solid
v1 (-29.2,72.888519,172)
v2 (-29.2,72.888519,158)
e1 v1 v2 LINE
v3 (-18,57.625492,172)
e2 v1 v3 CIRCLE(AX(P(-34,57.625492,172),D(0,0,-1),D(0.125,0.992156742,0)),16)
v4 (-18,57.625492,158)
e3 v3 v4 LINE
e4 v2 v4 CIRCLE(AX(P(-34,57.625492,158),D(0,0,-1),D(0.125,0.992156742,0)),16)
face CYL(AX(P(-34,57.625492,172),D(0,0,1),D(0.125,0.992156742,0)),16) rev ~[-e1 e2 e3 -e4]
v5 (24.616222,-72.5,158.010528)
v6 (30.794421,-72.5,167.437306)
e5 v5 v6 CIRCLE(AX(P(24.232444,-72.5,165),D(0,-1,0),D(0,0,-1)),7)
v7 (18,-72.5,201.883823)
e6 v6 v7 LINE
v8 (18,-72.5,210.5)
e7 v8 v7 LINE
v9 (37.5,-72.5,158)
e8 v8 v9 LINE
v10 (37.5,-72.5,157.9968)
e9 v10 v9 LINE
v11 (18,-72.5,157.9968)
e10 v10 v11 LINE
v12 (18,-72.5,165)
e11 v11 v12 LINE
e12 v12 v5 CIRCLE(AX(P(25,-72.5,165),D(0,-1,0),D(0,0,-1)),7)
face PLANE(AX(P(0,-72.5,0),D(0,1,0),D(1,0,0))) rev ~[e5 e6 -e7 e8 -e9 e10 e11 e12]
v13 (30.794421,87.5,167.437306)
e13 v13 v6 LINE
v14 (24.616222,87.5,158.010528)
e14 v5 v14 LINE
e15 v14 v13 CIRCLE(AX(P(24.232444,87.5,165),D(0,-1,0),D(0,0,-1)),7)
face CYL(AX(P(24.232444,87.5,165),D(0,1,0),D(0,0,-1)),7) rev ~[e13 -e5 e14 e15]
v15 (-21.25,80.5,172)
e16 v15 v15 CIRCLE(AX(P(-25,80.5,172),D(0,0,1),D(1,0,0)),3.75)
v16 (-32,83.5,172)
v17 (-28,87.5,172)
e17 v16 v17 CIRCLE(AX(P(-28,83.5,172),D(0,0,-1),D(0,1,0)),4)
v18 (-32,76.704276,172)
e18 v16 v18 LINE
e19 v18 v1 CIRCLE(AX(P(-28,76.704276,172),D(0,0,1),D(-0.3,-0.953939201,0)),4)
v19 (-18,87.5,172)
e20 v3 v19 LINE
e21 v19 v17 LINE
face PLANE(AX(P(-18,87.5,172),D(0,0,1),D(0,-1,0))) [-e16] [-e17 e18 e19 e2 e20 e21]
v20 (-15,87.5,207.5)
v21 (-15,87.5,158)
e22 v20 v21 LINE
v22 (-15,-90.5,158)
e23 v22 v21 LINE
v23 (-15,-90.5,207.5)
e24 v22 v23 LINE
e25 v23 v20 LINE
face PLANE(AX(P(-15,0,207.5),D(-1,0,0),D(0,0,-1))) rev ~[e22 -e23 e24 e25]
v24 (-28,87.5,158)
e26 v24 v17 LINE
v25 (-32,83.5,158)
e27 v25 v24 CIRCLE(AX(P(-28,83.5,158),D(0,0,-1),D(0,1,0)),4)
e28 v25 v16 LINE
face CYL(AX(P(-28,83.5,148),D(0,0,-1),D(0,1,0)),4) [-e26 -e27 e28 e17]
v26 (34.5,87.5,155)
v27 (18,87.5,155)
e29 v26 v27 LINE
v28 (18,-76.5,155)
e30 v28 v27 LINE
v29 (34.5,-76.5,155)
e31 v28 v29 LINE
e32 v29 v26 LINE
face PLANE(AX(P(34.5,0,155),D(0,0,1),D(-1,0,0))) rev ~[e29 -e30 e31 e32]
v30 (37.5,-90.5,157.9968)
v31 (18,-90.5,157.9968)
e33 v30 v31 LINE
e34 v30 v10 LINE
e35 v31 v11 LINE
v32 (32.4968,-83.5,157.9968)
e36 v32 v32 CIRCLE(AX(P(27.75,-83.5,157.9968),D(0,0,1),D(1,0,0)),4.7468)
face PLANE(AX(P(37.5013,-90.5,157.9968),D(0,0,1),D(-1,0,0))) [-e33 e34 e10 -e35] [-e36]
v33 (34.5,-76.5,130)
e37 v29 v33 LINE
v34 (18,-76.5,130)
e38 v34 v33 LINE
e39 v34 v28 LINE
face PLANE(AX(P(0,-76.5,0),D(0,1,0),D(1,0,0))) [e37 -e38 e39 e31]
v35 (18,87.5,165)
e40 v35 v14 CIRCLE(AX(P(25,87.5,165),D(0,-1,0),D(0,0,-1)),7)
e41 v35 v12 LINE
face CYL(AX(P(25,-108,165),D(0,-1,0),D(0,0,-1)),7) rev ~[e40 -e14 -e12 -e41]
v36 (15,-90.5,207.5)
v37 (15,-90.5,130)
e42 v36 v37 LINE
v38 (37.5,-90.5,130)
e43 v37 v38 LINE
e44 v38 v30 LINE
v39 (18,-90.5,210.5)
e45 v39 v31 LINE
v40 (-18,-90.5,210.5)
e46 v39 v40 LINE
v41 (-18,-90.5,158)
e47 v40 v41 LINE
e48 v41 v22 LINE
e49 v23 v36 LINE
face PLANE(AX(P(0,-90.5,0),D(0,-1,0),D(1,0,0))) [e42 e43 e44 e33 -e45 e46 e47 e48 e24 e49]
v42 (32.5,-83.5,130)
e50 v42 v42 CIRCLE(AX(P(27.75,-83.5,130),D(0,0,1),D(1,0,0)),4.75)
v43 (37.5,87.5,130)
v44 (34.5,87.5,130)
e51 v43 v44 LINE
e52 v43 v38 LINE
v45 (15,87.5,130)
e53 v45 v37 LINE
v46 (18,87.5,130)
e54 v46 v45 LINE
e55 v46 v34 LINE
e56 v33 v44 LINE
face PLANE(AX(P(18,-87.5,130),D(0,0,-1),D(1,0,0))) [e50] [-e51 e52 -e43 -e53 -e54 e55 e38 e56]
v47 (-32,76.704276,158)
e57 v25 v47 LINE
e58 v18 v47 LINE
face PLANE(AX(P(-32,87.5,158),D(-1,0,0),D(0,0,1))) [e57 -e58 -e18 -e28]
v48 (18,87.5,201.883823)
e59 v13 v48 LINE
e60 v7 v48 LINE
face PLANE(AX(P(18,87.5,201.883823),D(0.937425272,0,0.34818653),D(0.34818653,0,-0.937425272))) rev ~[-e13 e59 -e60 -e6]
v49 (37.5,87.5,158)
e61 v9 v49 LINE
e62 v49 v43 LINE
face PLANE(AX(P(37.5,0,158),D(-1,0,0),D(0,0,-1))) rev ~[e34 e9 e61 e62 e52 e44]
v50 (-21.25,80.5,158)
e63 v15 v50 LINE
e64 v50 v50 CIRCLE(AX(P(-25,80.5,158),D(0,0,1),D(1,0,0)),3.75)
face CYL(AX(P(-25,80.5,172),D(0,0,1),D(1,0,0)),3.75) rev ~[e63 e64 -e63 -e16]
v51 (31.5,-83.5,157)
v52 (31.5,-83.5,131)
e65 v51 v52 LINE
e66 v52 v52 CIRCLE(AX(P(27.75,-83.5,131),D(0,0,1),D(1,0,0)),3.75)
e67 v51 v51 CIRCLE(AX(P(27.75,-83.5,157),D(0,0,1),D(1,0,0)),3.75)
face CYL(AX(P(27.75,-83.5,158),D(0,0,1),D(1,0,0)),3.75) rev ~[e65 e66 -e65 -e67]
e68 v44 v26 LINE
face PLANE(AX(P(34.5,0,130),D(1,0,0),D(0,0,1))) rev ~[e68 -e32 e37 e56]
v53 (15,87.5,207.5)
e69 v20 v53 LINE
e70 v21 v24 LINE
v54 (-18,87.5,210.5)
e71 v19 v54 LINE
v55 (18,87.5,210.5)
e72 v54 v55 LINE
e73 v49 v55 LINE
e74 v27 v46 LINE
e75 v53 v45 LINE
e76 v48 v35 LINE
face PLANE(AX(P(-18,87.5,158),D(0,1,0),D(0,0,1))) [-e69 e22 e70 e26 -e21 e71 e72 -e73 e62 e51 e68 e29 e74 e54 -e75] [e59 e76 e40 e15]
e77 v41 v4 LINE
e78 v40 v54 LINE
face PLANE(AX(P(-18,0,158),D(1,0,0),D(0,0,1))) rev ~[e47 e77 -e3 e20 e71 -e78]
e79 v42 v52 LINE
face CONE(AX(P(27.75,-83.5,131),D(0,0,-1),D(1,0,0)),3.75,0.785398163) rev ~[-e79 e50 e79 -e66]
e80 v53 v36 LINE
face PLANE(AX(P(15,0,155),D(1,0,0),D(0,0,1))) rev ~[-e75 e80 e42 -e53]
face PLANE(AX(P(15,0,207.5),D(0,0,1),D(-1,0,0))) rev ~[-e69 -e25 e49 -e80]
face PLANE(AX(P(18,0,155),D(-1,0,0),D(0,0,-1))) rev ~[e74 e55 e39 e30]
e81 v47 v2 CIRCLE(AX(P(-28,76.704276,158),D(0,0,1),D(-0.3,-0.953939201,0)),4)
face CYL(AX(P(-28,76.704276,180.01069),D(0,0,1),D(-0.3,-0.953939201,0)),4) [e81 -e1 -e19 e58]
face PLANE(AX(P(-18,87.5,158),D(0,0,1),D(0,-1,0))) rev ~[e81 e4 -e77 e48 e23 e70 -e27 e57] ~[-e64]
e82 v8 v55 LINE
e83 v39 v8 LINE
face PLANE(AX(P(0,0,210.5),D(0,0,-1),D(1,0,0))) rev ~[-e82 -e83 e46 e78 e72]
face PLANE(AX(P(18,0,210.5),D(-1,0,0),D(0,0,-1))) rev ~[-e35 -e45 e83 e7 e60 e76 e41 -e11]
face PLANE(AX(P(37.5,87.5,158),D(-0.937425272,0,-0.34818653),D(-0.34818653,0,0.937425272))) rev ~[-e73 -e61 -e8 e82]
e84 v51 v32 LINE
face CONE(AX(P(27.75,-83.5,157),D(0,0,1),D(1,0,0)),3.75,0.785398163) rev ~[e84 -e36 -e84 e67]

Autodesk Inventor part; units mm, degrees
ref_plane "YZ Plane" through (0, 0, 0) normal (1, 0, 0) x (0, 1, 0)
ref_plane "XZ Plane" through (0, 0, 0) normal (0, 1, 0) x (-1, 0, 0)
ref_plane "XY Plane" through (0, 0, 0) normal (0, 0, 1) x (1, 0, 0)
sketch "Skizze1" plane through (0, 0, 0) normal (0, 0, 1) x (1, 0, 0)
  line L0 (-26.25, -95) -> (26.25, -95)
  line L1 (26.25, -95) -> (26.25, 95)
  line L2 (26.25, 95) -> (-26.25, 95)
  line L3 (-26.25, 95) -> (-26.25, -95)
  line L4 (-38.4, 0) -> (46.65, 0) projected
  line L5 (0, -140.5) -> (0, 178) projected
  dimension "d0" = 52.5
  dimension "d1" = 190
sketch "Skizze2" plane through (0, 0, 0) normal (0, 1, 0) x (-1, 0, 0)
  line L0 (39, 0) -> (-50.25, 0) projected
  line L1 (0, -228.1) -> (0, 283.6) projected
  line L2 (18, 158) -> (18, 210.5)
  line L3 (18, 210.5) -> (-18, 210.5)
  line L4 (-18, 210.5) -> (-18, 158)
  line L5 (-18, 158) -> (-37.5, 158)
  line L6 (-37.5, 158) -> (-37.5, 130)
  line L7 (-37.5, 130) -> (-34.5, 130)
  line L8 (-34.5, 130) -> (-34.5, 155)
  line L9 (-34.5, 155) -> (-15, 155)
  line L10 (-15, 155) -> (-15, 207.5)
  line L11 (-15, 207.5) -> (15, 207.5)
  line L12 (15, 207.5) -> (15, 158)
  line L13 (15, 158) -> (18, 158)
  line L14 (-15, 155) -> (-18, 155)
  line L15 (-18, 155) -> (-18, 130)
  line L16 (-18, 130) -> (-15, 130)
  line L17 (-15, 130) -> (-15, 155)
  point P0 (0, 0)
  dimension "d2" = 3
  dimension "d3" = 3
  dimension "d4" = 3
  dimension "d5" = 3
  dimension "d6" = 3
  dimension "d7" = 30
  dimension "d8" = 19.5
  dimension "d9" = 77.5
  dimension "d10" = 25
  dimension "d11" = 207.5
extrude "Extrusion1" add sketch "Skizze2" along normal mid plane 175
sketch "Skizze3" plane through (0, -87.5, 0) normal (0, -1, 0) x (1, 0, 0)
  line L0 (-18, 210.5) -> (-18, 158) projected
  line L1 (-18, 158) -> (-15, 158) projected
  line L2 (-15, 158) -> (-15, 207.5) projected
  line L3 (-15, 207.5) -> (15, 207.5) projected
  line L4 (15, 207.5) -> (15, 130) projected
  line L5 (18, 155) -> (34.5, 155) projected
  line L6 (34.5, 155) -> (34.5, 130) projected
  line L7 (34.5, 130) -> (37.5, 130) projected
  line L8 (37.5, 130) -> (37.5, 158) projected
  line L9 (37.5, 158) -> (18, 158) projected
  line L10 (18, 158) -> (18, 210.5) projected
  line L11 (18, 210.5) -> (-18, 210.5) projected
  line L12 (34.5, 130) -> (34.5, 155) projected
  line L13 (34.5, 155) -> (15, 155)
  line L14 (15, 155) -> (15, 130)
  line L15 (15, 130) -> (34.5, 130)
  line L16 (34.5, 130) -> (34.5, 155)
  line L17 (15, 130) -> (18, 130) projected
  line L18 (18, 130) -> (18, 155) projected
  line L19 (15, 130) -> (15, 207.5) projected
extrude "Extrusion2" add sketch "Skizze3" along normal blind 3
sketch "Skizze8" plane through (0, -87.5, 0) normal (0, 1, 0) x (1, 0, 0)
  line L0 (18, -130) -> (18, -155) projected
  line L1 (18, -155) -> (34.5, -155) projected
  line L2 (34.5, -155) -> (34.5, -130) projected
  line L3 (18, -130) -> (34.5, -130) projected
extrude "Extrusion5" add sketch "Skizze8" along normal blind 11
sketch "Skizze9" plane through (18, 87.5, 158) normal (0, 0, 1) x (1, 0, 0)
  circle A0 centre (9.75, -171) radius 3.75
  line L0 (19.5, 0) -> (19.5, -178) construction
  line L1 (0, 0) -> (19.5, 0) projected
  line L2 (0, 0) -> (0, -178) construction
  line L3 (19.5, -178) -> (0, -178) construction
  line L4 (16.5, -164) -> (0, -164) construction
  line L5 (0, -164) -> (19.5, -164) construction
  line L6 (19.5, -164) -> (19.5, -178) construction
  line L7 (19.5, -178) -> (0, -178) construction
  line L8 (0, -178) -> (0, -164) construction
  line L9 (0, 0) -> (0, -178) projected
  line L10 (0, -178) -> (19.5, -164) construction
  line L11 (0, -164) -> (19.5, -178) construction
  dimension "d34" = 7.5
extrude "Extrusion6" cut sketch "Skizze9" against normal through all
chamfer "Fase1" distance 1 angle 45 2 edges at (24, -83.5, 158) (24, -83.5, 130)
sketch "Skizze10" plane through (-18, 87.5, 158) normal (-1, 0, 0) x (0, 0, 1)
  line L0 (0, 0) -> (52.5, 0) projected
  line L1 (52.5, -178) -> (52.5, 0) projected
  line L2 (0, 0) -> (52.5, 0) projected
  line L3 (0, 0) -> (0, -178) projected
  line L4 (52.5, -178) -> (0, -178) projected
  line L5 (0, 0) -> (14, 0)
  line L6 (14, 0) -> (14, -14)
  line L7 (14, -14) -> (0, -14)
  line L8 (0, -14) -> (0, 0)
  dimension "d40" = 14
  dimension "d41" = 14
extrude "Extrusion7" add sketch "Skizze10" along normal blind 14 contours L0 L6 L7 L3
fillet "Rundung2" radius 16 1 edges at (-18, 73.5, 165)
fillet "Rundung2" radius 4 1 edges at (-32, 73.5, 165)
fillet "Rundung2" radius 4 1 edges at (-32, 87.5, 165)
sketch "Skizze11" plane through (-32, 87.5, 172) normal (0, 0, 1) x (1, 0, 0)
  circle A0 centre (7, -7) radius 7
  arc A1 (0, -10.7957) -> (2.8, -14.6115) centre (4, -10.7957) ccw projected
  arc A2 (14, -29.8745) -> (2.8, -14.6115) centre (-2, -29.8745) ccw projected
  line L0 (14, 0) -> (14, -29.8745) projected
  line L1 (14, 0) -> (4, 0) projected
  line L2 (0, -10.7957) -> (0, -4) projected
  line L3 (14, 0) -> (4, 0) projected
  line L4 (0, -10.7957) -> (0, -4) projected
  circle A3 centre (7, -7) radius 3.75
  arc A4 (4, 0) -> (0, -4) centre (4, -4) ccw projected
  point P0 (0, 0)
  dimension "d46" = 7
  dimension "d47" = 7.5
extrude "Extrusion8" cut sketch "Skizze11" against normal through all contours A3
sketch "Skizze4" plane through (34.5, 87.5, 130) normal (-1, 0, 0) x (0, 0, 1)
  line L0 (25, 0) -> (25, -175) projected
  line L1 (25, -175) -> (-285, -175)
  line L2 (-285, -175) -> (-285, 45)
  line L3 (-285, 45) -> (25, 45)
  line L4 (25, 45) -> (25, -175)
  dimension "d16" = 310
  dimension "d17" = 220
sketch "Skizze5" plane through (-18, 87.5, 158) normal (-1, 0, 0) x (0, 0, 1)
  line L0 (6, -5) -> (46.5, -5) construction
  line L1 (6, -2.75) -> (46.5, -2.75)
  line L2 (46.5, -7.25) -> (6, -7.25)
  arc A0 (6, -2.75) -> (6, -7.25) centre (6, -5) ccw
  arc A1 (46.5, -7.25) -> (46.5, -2.75) centre (46.5, -5) ccw
  line L3 (-313, 45) -> (-3, 45) projected
  line L4 (0, 0) -> (0, -178) projected
  line L5 (52.5, -178) -> (52.5, 0) projected
  point P0 (26.25, -5)
  dimension "d18" = 4.5
  dimension "d19" = 50
  dimension "d20" = 6
  dimension "d21" = 6
extrude "Extrusion3" [suppressed]
pattern_linear "Rechteckige Anordnung1" [suppressed]
sketch "Skizze13" plane through (0, 87.5, 0) normal (0, 1, 0) x (1, 0, 0)
  line L0 (37.5, -158) -> (37.5, -130) projected
  line L1 (37.5, -158) -> (18, -210.5)
  line L2 (18, -210.5) -> (15.1877, -209.4554)
  line L3 (15.1877, -209.4554) -> (34.6877, -156.9554)
  line L4 (34.6877, -156.9554) -> (37.5, -158)
  line L5 (18, -210.5) -> (18, -158) projected
  line L6 (15, -130) -> (15, -207.5) projected
  dimension "d51" = 3
  dimension "d52" = 3
extrude "Extrusion9" add sketch "Skizze13" against normal blind 160
fillet "Rundung3" radius 7 2 edges at (34.2997, 7.5, 158) (18, -1.5, 158)
sketch "Skizze14" plane through (0, -90.5, 0) normal (0, -1, 0) x (1, 0, 0)
  line L0 (18, 201.8839) -> (18, 165) projected
  line L1 (37.5013, 157.9968) -> (18, 157.9968)
  line L2 (18, 157.9968) -> (18, 175.3621)
  line L3 (18, 175.3621) -> (37.5013, 175.3621)
  line L4 (37.5013, 175.3621) -> (37.5013, 157.9968)
extrude "Extrusion10" cut sketch "Skizze14" against normal up to surface (18 mm away)
equation "\"d0\" = -0.5 * BreiteTablet + 0.5 * BreitePanel"
equation "\"d2\" = Materialstaerke"
equation "\"d3\" = d2"
equation "\"d4\" = d3"
equation "\"d5\" = d2"
equation "\"d6\" = d5"
equation "\"d7\" = DickePanel"
equation "\"d8\" = DickeTablet + Materialstaerke"
equation "\"d9\" = 0.5 * BreitePanel - 0.5 * BreiteTablet + BreiteRahmenTabletScreen"
equation "\"d10\" = BreiteRahmenTabletScreen"
equation "\"d11\" = 0.5 * BreitePanel"
equation "\"d14\" = Materialstaerke"
equation "\"d41\" = d40"
equation "\"d16\" = BreiteTablet"
equation "\"d17\" = HöheTablet"
equation "\"d18\" = DurchmesserLoch"
equation "\"d19\" = VersatzSchraubeOberkanteTB"
equation "\"d20\" = 2 * Materialstaerke"
equation "\"d21\" = 2 * Materialstaerke"
equation "\"d22\" = Materialstaerke"
equation "\"d26\" = AbstandLochbild"
equation "\"d52\" = d51"
equation "\"BreiteTablet\" = 310"
equation "\"HöheTablet\" = 220"
equation "\"DickeTablet\" = 16.5"
equation "\"BreitePanel\" = 415"
equation "\"DickePanel\" = 30"
equation "\"AbstandLochbild\" = 150"
equation "\"DurchmesserLoch\" = 4.5"
equation "\"VersatzSchraubeOberkanteTB\" = 50"
equation "\"Materialstaerke\" = 3"
equation "\"BreiteRahmenTabletScreen\" = 25"
properties part number "AufnahmeLinks"
